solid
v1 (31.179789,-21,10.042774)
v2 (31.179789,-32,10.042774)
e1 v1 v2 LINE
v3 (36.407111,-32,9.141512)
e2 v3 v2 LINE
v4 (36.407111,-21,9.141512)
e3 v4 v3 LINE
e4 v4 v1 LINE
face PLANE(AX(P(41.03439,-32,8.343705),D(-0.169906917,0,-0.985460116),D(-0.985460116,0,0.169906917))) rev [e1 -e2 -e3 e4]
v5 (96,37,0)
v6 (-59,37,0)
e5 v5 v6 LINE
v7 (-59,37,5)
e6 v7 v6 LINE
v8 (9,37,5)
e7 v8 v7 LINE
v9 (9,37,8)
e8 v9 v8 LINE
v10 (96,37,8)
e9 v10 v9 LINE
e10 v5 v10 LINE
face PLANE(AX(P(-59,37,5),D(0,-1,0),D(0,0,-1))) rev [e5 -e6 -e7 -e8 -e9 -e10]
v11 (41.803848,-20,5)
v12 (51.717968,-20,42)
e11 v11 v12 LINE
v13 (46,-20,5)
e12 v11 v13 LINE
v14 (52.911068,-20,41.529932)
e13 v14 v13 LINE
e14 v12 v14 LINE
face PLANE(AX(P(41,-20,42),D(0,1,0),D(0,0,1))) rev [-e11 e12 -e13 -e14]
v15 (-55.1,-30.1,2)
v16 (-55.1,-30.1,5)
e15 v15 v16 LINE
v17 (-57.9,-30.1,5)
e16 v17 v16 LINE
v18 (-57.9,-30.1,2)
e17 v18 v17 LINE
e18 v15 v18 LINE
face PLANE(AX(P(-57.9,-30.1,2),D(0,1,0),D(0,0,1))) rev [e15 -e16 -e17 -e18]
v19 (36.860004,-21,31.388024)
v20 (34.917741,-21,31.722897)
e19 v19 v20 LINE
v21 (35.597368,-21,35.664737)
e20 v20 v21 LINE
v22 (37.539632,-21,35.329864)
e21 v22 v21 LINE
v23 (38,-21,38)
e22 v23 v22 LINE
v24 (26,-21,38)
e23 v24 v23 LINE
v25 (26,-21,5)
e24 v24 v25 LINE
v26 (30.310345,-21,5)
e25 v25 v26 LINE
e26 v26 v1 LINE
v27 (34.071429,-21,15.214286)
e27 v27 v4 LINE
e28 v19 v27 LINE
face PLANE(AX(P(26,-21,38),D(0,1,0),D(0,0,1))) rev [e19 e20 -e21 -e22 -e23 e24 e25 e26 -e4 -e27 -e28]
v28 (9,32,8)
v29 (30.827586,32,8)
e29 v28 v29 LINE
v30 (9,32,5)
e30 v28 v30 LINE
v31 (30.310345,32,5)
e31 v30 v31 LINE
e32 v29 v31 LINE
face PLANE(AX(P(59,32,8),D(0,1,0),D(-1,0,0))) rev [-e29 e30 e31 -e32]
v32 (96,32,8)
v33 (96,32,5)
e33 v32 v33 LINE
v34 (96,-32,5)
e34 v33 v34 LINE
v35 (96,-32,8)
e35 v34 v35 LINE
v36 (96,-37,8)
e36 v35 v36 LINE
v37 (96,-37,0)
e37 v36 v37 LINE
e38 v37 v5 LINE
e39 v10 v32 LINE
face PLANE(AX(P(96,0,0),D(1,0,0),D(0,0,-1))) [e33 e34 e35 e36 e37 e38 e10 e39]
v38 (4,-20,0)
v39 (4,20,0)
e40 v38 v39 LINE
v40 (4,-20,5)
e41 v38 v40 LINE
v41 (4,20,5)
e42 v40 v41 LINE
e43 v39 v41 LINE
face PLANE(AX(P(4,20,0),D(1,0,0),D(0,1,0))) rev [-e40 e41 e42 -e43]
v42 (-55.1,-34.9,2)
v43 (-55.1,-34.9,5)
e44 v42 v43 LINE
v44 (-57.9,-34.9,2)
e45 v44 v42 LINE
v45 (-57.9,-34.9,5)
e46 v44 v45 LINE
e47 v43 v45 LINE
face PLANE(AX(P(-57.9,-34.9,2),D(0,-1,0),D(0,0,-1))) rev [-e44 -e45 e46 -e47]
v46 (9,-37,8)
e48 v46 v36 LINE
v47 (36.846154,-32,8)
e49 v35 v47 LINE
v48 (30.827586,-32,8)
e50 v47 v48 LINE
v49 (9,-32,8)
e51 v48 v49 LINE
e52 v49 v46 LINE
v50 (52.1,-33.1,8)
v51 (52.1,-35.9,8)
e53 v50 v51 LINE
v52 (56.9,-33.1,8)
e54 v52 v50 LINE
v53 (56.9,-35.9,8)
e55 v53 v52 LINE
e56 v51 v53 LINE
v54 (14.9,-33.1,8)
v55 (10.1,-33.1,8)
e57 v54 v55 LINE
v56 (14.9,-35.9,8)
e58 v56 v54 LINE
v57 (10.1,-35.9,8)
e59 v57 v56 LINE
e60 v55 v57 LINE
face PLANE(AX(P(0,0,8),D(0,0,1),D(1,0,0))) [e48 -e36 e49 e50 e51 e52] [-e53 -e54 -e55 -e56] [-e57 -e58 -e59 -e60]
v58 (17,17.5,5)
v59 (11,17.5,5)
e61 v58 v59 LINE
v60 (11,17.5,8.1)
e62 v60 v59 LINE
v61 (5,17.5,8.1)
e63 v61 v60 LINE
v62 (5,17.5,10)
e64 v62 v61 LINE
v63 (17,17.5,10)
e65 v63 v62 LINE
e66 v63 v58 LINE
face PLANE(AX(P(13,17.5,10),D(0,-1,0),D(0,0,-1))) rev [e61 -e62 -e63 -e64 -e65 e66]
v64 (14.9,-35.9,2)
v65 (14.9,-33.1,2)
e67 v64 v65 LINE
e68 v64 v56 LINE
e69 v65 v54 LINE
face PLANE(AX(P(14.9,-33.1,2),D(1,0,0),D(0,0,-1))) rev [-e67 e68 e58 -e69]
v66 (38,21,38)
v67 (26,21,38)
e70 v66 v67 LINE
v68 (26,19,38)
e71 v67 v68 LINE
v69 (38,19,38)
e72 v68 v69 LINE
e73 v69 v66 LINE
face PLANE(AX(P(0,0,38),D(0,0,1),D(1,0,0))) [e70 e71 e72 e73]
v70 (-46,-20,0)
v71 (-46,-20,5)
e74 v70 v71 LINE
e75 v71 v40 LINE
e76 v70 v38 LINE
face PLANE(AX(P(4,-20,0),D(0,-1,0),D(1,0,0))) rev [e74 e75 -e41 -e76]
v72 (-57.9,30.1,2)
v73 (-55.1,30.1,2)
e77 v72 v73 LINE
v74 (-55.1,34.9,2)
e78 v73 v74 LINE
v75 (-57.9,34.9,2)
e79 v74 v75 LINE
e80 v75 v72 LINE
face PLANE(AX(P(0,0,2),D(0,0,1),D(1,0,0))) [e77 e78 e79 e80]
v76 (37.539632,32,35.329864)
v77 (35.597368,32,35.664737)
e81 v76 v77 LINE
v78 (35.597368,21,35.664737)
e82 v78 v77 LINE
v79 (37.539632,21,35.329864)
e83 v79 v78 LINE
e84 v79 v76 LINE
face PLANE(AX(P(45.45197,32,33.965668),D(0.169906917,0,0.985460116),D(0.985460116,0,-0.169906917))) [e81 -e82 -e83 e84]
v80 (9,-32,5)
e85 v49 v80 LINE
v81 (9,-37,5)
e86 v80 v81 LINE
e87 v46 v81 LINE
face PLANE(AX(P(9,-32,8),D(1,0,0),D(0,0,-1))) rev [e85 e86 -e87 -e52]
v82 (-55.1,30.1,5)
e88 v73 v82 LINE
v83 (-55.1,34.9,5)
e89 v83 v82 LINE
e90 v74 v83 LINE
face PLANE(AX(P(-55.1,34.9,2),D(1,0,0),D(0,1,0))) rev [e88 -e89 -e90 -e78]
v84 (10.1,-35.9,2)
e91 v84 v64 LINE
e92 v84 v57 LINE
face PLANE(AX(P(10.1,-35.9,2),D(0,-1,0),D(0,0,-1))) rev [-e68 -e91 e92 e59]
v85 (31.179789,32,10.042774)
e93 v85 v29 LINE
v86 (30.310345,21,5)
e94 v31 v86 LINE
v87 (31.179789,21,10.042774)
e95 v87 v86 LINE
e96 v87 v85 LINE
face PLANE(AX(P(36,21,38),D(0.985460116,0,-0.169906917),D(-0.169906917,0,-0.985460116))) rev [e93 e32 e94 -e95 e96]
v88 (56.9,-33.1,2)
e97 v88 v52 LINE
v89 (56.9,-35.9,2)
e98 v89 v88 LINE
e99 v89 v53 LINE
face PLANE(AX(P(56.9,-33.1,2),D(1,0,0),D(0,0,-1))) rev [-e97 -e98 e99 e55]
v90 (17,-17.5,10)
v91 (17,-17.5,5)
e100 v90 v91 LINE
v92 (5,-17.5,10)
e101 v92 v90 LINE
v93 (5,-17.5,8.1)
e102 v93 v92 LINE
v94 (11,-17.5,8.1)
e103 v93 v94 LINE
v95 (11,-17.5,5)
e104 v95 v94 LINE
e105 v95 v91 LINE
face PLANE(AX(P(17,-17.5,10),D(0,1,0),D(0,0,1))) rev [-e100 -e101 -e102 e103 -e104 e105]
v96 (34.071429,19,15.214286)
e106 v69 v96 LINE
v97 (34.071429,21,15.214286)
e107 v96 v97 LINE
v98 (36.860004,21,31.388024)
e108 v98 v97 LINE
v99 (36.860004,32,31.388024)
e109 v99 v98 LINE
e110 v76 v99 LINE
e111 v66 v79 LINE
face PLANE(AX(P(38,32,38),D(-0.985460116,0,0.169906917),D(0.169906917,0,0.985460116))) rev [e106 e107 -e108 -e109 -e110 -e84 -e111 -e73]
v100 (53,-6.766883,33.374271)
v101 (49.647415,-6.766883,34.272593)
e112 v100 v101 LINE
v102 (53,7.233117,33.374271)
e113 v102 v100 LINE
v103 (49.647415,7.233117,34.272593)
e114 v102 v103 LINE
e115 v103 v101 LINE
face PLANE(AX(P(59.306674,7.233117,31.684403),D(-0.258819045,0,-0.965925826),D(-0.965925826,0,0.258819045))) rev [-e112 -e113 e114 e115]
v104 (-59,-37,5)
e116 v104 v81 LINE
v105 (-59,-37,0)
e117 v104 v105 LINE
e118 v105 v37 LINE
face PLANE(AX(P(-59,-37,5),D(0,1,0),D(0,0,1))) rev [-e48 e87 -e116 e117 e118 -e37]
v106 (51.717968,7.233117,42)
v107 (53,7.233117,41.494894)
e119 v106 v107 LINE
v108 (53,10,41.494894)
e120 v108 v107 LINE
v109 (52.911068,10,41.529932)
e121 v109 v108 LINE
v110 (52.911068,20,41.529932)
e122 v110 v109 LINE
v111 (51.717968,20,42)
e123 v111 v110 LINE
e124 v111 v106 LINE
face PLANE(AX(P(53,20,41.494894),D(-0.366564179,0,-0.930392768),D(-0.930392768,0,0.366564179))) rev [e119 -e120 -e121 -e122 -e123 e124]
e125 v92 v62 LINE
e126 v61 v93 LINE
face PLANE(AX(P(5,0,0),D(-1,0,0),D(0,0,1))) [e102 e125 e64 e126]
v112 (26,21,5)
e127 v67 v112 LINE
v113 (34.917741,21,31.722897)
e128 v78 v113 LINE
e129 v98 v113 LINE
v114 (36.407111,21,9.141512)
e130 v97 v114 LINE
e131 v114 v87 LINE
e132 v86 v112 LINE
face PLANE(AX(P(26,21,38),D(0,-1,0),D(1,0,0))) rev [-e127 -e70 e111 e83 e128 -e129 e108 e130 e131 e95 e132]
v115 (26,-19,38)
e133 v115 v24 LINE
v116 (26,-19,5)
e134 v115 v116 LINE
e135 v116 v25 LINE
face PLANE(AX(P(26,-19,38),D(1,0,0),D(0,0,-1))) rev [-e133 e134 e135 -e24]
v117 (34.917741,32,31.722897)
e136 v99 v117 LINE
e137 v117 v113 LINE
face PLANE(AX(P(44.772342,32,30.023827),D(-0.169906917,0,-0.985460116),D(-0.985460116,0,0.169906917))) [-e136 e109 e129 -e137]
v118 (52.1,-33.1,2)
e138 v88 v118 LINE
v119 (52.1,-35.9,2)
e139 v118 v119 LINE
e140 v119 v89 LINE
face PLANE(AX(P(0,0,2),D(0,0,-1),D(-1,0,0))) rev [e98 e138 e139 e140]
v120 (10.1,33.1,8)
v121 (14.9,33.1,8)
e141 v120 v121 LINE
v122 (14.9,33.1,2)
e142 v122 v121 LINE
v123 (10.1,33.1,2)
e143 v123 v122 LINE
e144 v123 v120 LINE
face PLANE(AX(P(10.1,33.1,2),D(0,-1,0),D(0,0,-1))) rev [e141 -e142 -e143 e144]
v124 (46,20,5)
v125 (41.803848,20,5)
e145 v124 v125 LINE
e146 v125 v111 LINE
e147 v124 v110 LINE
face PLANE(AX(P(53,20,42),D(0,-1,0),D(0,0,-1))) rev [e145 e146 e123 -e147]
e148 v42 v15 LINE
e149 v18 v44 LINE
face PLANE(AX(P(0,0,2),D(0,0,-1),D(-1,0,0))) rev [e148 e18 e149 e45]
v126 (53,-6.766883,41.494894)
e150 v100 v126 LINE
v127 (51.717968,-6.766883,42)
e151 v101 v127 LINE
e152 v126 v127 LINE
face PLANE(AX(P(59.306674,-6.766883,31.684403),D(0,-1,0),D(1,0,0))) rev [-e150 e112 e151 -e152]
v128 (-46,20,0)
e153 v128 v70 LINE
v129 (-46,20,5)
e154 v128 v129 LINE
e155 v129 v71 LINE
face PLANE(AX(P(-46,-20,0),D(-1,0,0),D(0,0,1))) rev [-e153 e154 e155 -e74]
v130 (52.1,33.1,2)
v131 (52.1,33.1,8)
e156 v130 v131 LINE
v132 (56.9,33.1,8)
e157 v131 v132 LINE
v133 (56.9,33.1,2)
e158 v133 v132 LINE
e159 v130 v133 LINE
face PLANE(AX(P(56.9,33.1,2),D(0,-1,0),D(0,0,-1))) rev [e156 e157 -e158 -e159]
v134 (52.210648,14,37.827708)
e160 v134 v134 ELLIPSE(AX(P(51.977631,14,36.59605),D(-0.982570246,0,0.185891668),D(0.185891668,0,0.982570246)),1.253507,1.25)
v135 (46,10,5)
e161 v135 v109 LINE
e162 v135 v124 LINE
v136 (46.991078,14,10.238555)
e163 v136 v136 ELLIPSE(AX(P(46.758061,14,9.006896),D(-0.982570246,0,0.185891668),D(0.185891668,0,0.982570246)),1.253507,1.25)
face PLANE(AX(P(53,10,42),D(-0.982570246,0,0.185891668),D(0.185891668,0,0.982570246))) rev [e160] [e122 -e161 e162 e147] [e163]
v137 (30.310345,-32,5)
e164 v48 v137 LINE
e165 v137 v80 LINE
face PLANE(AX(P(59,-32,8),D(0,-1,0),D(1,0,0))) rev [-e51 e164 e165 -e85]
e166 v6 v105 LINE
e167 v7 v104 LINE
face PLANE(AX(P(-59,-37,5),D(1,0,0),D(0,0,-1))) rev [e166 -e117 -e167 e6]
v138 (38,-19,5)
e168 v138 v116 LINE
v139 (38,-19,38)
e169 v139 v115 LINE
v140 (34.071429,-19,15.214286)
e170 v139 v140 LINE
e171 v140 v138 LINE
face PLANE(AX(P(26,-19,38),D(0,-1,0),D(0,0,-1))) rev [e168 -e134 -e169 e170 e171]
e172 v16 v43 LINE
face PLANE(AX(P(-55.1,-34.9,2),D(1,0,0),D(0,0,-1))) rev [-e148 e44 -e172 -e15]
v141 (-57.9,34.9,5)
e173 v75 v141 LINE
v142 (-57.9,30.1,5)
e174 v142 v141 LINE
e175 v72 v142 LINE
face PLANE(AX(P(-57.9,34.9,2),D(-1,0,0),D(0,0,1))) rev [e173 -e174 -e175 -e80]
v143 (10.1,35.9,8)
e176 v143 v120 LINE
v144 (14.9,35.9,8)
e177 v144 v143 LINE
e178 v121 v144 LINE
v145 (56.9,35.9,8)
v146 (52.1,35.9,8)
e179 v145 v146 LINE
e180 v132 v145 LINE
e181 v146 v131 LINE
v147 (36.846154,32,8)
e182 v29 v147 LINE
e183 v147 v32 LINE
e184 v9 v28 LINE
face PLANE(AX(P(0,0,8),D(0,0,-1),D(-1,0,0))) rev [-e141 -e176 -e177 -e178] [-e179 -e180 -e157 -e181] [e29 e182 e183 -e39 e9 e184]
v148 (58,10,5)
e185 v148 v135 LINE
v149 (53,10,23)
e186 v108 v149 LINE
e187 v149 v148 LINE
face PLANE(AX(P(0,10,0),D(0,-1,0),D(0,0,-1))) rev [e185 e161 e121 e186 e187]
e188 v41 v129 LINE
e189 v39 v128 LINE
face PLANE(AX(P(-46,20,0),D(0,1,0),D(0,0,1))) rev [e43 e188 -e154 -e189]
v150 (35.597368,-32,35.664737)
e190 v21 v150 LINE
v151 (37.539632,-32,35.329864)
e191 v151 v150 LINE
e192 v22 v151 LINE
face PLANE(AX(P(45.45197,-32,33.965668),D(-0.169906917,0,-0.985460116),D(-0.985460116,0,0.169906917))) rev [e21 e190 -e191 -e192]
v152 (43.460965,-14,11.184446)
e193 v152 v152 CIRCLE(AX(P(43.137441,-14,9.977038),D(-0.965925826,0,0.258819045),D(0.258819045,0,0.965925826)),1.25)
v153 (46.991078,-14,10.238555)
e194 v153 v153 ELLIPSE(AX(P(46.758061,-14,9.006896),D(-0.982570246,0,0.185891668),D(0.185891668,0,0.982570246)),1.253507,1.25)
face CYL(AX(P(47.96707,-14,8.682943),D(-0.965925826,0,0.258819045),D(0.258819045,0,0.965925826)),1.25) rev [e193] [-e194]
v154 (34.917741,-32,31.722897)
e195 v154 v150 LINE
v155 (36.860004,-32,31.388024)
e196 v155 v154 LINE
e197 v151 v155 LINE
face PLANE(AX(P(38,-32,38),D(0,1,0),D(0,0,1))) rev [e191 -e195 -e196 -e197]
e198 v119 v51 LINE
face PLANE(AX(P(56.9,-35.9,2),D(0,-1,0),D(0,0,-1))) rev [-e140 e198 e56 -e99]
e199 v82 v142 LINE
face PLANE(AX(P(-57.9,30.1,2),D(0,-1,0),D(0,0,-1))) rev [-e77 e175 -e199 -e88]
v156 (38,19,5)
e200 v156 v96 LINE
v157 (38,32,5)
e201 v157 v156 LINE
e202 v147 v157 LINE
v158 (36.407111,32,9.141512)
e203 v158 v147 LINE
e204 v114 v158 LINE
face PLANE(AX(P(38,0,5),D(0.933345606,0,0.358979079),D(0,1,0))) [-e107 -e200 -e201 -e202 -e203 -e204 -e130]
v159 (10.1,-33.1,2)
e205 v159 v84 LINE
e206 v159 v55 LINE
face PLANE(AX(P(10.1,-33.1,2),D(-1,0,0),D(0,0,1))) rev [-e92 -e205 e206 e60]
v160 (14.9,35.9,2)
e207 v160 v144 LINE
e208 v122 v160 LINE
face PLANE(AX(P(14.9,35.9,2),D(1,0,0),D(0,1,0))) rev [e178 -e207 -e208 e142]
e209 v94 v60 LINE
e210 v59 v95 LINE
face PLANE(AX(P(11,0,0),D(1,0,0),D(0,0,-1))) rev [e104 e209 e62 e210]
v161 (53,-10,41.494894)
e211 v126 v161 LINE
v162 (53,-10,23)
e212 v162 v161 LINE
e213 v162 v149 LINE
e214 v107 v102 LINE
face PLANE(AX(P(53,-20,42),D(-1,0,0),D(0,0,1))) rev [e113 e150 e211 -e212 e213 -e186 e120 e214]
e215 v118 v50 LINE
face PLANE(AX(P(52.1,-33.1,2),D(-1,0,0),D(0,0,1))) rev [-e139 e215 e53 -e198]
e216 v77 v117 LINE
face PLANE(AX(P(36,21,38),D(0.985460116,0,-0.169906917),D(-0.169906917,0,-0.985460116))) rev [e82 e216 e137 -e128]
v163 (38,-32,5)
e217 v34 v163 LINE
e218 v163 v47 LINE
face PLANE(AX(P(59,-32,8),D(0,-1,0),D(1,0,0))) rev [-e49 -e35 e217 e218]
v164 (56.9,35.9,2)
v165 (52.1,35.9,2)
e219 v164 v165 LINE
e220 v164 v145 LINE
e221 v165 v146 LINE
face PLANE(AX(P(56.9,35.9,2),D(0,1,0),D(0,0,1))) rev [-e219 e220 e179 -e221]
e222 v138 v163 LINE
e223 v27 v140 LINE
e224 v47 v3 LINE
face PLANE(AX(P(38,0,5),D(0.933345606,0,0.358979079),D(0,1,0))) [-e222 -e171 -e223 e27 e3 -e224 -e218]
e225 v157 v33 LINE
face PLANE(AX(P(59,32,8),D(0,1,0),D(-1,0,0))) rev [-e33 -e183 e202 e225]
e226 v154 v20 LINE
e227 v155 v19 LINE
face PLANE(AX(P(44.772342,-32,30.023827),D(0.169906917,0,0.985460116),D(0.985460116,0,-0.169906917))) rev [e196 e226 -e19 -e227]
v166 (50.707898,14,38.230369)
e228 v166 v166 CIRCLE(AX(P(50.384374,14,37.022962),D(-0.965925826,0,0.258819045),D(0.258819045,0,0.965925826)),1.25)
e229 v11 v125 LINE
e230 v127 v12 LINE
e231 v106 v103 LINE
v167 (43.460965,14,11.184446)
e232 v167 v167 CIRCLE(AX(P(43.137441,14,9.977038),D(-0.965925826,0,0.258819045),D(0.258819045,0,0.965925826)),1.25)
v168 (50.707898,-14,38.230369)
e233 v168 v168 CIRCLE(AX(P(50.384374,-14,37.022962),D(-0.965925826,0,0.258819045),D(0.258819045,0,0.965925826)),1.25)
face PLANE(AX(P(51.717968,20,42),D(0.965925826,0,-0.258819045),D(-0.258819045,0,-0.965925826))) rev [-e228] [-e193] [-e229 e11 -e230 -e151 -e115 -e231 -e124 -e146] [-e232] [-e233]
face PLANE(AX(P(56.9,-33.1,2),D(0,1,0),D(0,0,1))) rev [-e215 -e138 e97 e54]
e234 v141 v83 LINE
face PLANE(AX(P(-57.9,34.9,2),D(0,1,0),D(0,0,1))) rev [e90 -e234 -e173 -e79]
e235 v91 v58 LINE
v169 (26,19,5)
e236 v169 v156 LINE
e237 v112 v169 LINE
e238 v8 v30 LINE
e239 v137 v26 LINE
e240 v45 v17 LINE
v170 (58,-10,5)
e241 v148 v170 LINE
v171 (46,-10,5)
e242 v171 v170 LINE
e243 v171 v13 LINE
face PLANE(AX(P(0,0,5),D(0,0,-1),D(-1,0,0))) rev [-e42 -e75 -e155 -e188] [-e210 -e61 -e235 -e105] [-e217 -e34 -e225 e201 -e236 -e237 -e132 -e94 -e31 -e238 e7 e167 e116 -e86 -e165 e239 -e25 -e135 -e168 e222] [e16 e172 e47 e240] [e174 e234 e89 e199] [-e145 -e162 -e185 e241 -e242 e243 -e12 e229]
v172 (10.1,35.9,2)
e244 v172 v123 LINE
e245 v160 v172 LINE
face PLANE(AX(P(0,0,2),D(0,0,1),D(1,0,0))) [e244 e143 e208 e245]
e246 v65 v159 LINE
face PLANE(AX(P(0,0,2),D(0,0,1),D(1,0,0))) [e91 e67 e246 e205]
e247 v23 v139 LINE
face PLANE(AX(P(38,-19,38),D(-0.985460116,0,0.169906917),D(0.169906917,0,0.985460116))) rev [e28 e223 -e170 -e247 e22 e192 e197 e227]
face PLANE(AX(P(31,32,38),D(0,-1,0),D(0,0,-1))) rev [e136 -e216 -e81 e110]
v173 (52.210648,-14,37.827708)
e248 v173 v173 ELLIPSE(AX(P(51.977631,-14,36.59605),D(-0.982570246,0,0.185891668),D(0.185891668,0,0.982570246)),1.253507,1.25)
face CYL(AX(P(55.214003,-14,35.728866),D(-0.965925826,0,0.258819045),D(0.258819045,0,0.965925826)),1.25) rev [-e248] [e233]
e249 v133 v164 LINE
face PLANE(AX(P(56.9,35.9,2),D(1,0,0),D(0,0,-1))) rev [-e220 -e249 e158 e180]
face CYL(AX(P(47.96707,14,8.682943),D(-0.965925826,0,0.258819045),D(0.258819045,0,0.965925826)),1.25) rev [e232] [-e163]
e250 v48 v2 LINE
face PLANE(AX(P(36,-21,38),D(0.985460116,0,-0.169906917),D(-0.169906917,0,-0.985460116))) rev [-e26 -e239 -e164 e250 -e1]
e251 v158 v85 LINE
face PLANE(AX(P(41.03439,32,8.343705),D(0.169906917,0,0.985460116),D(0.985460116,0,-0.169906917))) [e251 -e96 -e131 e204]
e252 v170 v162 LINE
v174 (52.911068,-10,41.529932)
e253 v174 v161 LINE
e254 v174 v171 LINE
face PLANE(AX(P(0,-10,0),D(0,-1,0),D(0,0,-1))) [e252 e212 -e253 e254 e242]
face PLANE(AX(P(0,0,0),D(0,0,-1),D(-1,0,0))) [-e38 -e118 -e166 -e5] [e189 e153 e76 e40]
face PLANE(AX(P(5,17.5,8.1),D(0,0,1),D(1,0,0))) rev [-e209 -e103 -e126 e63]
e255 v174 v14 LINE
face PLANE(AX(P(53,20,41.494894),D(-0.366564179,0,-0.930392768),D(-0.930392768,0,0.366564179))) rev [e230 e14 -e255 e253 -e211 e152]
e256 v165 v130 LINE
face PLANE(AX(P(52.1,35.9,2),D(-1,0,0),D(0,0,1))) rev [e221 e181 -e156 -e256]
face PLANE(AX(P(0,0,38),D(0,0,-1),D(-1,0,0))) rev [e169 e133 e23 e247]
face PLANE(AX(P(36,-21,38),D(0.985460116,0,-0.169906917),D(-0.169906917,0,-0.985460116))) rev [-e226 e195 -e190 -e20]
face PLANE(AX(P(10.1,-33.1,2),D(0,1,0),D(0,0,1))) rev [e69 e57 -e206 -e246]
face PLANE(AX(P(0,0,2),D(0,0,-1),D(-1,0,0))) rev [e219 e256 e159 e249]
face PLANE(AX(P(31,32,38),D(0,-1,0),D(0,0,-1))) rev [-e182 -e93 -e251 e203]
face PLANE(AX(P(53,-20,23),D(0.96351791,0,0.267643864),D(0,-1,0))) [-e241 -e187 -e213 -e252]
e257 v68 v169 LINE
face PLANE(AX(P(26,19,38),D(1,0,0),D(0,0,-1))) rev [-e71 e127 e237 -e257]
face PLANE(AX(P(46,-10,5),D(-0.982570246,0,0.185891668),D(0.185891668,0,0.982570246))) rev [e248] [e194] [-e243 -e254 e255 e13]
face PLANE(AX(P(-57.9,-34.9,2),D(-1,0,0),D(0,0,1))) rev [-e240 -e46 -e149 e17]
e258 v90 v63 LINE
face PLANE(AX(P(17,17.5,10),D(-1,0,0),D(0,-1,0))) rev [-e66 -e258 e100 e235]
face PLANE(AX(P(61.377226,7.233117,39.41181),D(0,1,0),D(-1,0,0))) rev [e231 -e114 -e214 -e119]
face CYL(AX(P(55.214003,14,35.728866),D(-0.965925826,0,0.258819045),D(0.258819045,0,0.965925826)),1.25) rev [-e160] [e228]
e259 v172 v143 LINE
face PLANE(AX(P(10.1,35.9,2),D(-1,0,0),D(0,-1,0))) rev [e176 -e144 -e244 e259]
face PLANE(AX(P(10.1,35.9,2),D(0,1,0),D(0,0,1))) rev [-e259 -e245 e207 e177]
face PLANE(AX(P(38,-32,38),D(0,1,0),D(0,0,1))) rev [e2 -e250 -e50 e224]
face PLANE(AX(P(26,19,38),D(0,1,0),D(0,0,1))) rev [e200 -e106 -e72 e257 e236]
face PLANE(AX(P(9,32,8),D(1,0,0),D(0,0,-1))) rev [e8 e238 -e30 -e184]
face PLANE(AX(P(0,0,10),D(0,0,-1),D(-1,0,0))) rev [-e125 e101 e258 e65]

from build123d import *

# Parameters (mm, degrees)
CROQUIS1_W               = 118
CROQUIS1_H               = 74
SALIENTE_EXTRUIR1_DEPTH  = 5
CROQUIS2_W               = 50
CROQUIS2_H               = 40
CORTAR_EXTRUIR1_DEPTH    = 5
CROQUIS3_W               = 50
CROQUIS3_H               = 5
SALIENTE_EXTRUIR2_DEPTH  = 3
CROQUIS4_W               = 4.8
CROQUIS4_H               = 2.8
CROQUIS4_W_2             = 2.8
CROQUIS4_H_2             = 4.8
CORTAR_EXTRUIR2_DEPTH    = 6
CROQUIS5_W               = 3
CROQUIS5_H               = 40
CORTAR_EXTRUIR3_DEPTH    = 3
CROQUIS6_W               = 12
CROQUIS6_H               = 40
SALIENTE_EXTRUIR3_DEPTH  = 40
CROQUIS8_W               = 4
CROQUIS8_H               = 35
SALIENTE_EXTRUIR5_DEPTH  = 5
SALIENTE_EXTRUIR7_DEPTH  = 33
CORTAR_EXTRUIR6_DEPTH    = 11
CORTAR_EXTRUIR7_DEPTH    = 13
CORTAR_EXTRUIR8_DEPTH    = 13
CORTAR_EXTRUIR9_DEPTH    = 11
CROQUIS10_W              = 1.9
CROQUIS10_H              = 35
SALIENTE_EXTRUIR9_DEPTH  = 8
CROQUIS22_W              = 3.1
CROQUIS22_H              = 35
SALIENTE_EXTRUIR10_DEPTH = 2
CORTAR_EXTRUIR11_DEPTH   = 40
CROQUIS23_W              = 3
CROQUIS23_H              = 40
SALIENTE_EXTRUIR11_DEPTH = 10
CORTAR_EXTRUIR12_DEPTH   = 10
CORTAR_EXTRUIR13_DEPTH   = 10
CORTAR_EXTRUIR14_DEPTH   = 40
CROQUIS28_R              = 1.25
CORTAR_EXTRUIR15_DEPTH   = 5
SALIENTE_EXTRUIR12_DEPTH = 37
CROQUIS30_W              = 29.42787794
CROQUIS30_H              = 11
SALIENTE_EXTRUIR13_DEPTH = 1.970920231
CHAFL_N1_SIZE            = 5
CHAFL_N1_SIZE2           = 18
CHAFL_N2_SIZE            = 5
CHAFL_N2_SIZE_2          = 13
CHAFL_N3_SIZE            = 5
CHAFL_N3_SIZE_2          = 13
CROQUIS51_W              = 8
CROQUIS51_H              = 14
CORTAR_EXTRUIR23_DEPTH   = 10
CROQUIS52_W              = 9
CROQUIS52_H              = 11
CROQUIS52_W_2            = 8
CROQUIS52_W_3            = 4.539822883
CORTAR_EXTRUIR25_DEPTH   = 10
SALIENTE_EXTRUIR20_DEPTH = 12
CROQUIS54_W              = 5
CROQUIS54_H              = 11
CORTAR_EXTRUIR26_DEPTH   = 10
CROQUIS55_W              = 5
CROQUIS55_H              = 11
CORTAR_EXTRUIR30_DEPTH   = 10


with BuildPart() as part:
    # Croquis1 → Saliente-Extruir1 (new body)
    with BuildSketch(Plane.XY):
        Rectangle(CROQUIS1_W, CROQUIS1_H)
    extrude(amount=SALIENTE_EXTRUIR1_DEPTH)

    # Croquis2 → Cortar-Extruir1 (cut)
    with BuildSketch(Plane.XY.offset(5)):
        with Locations((-21, 0)):
            Rectangle(CROQUIS2_W, CROQUIS2_H)
    extrude(amount=-CORTAR_EXTRUIR1_DEPTH, mode=Mode.SUBTRACT)

    # Croquis3 → Saliente-Extruir2 (add)
    with BuildSketch(Plane.XY.offset(5)):
        with Locations((34, 34.5)):
            Rectangle(CROQUIS3_W, CROQUIS3_H)
        with Locations((34, -34.5)):
            Rectangle(CROQUIS3_W, CROQUIS3_H)
    extrude(amount=SALIENTE_EXTRUIR2_DEPTH)

    # Croquis4 → Cortar-Extruir2 (cut)
    with BuildSketch(Plane.XY.offset(8)):
        with Locations((54.5, 34.5)):
            Rectangle(CROQUIS4_W, CROQUIS4_H)
        with Locations((12.5, 34.5)):
            Rectangle(CROQUIS4_W, CROQUIS4_H)
        with Locations((12.5, -34.5)):
            Rectangle(CROQUIS4_W, CROQUIS4_H)
        with Locations((54.5, -34.5)):
            Rectangle(CROQUIS4_W, CROQUIS4_H)
        with Locations((-56.5, -32.5)):
            Rectangle(CROQUIS4_W_2, CROQUIS4_H_2)
        with Locations((-56.5, 32.5)):
            Rectangle(CROQUIS4_W_2, CROQUIS4_H_2)
    extrude(amount=-CORTAR_EXTRUIR2_DEPTH, mode=Mode.SUBTRACT)

    # Croquis5 → Cortar-Extruir3 (cut)
    with BuildSketch(Plane.XY.offset(5)):
        with Locations((39.5, 0)):
            Rectangle(CROQUIS5_W, CROQUIS5_H)
    extrude(amount=-CORTAR_EXTRUIR3_DEPTH, mode=Mode.SUBTRACT)

    # Croquis6 → Saliente-Extruir3 (add)
    with BuildSketch(Plane.XY.offset(2)):
        with Locations((47, 0)):
            Rectangle(CROQUIS6_W, CROQUIS6_H)
    extrude(amount=SALIENTE_EXTRUIR3_DEPTH)

    # Croquis8 → Saliente-Extruir5 (add)
    with BuildSketch(Plane.XY.offset(5)):
        with Locations((15, 0)):
            Rectangle(CROQUIS8_W, CROQUIS8_H)
    extrude(amount=SALIENTE_EXTRUIR5_DEPTH)

    # Croquis12 → Saliente-Extruir7 (add)
    with BuildSketch(Plane.XY.offset(5)):
        Polygon((26, -19), (38, -19), (38, -32), (31, -32), (31, -21), (26, -21), align=None)
        Polygon((31, 32), (38, 32), (38, 19), (26, 19), (26, 21), (31, 21), align=None)
    extrude(amount=SALIENTE_EXTRUIR7_DEPTH)

    # Croquis14 → Cortar-Extruir6 (cut)
    with BuildSketch(Plane(origin=(0, 32, 0), x_dir=(1, 0, 0), z_dir=(0, 1, 0))):
        Polygon((31, -38), (36, -38), (31, -9), align=None)
    extrude(amount=-CORTAR_EXTRUIR6_DEPTH, mode=Mode.SUBTRACT)

    # Croquis16 → Cortar-Extruir7 (cut)
    with BuildSketch(Plane.XZ.offset(-19)):
        Polygon((38, 38), (38, 5), (33, 5), (33, 9), align=None)
    extrude(amount=-CORTAR_EXTRUIR7_DEPTH, mode=Mode.SUBTRACT)

    # Croquis17 → Cortar-Extruir8 (cut)
    with BuildSketch(Plane.XZ.offset(32)):
        Polygon((38, 38), (38, 5), (33, 5), (33, 9), align=None)
    extrude(amount=-CORTAR_EXTRUIR8_DEPTH, mode=Mode.SUBTRACT)

    # Croquis18 → Cortar-Extruir9 (cut)
    with BuildSketch(Plane.XZ.offset(32)):
        Polygon((31, 38), (36, 38), (31, 9), align=None)
    extrude(amount=-CORTAR_EXTRUIR9_DEPTH, mode=Mode.SUBTRACT)

    # Croquis10 → Saliente-Extruir9 (add)
    with BuildSketch(Plane.ZY.offset(-13)):
        with Locations((9.05, 0)):
            Rectangle(CROQUIS10_W, CROQUIS10_H)
    extrude(amount=SALIENTE_EXTRUIR9_DEPTH)

    # Croquis22 → Saliente-Extruir10 (add)
    with BuildSketch(Plane.ZY.offset(-13)):
        with Locations((6.55, 0)):
            Rectangle(CROQUIS22_W, CROQUIS22_H)
    extrude(amount=SALIENTE_EXTRUIR10_DEPTH)

    # Croquis7 → Cortar-Extruir11 (cut)
    with BuildSketch(Plane.XZ.offset(20)):
        Polygon((51.717967697, 42), (41, 2), (41, 42), align=None)
    extrude(amount=-CORTAR_EXTRUIR11_DEPTH, mode=Mode.SUBTRACT)

    # Croquis23 → Saliente-Extruir11 (add)
    with BuildSketch(Plane(origin=(38, 0, 0), x_dir=(0, 0, -1), z_dir=(1, 0, 0))):
        with Locations((-3.5, 0)):
            Rectangle(CROQUIS23_W, CROQUIS23_H)
    extrude(amount=SALIENTE_EXTRUIR11_DEPTH)

    # Croquis25 → Cortar-Extruir12 (cut)
    with BuildSketch(Plane.XZ.offset(20)):
        Polygon((53, 42), (53, 5), (46, 5), align=None)
    extrude(amount=-CORTAR_EXTRUIR12_DEPTH, mode=Mode.SUBTRACT)

    # Croquis26 → Cortar-Extruir13 (cut)
    with BuildSketch(Plane(origin=(0, 20, 0), x_dir=(1, 0, 0), z_dir=(0, 1, 0))):
        Polygon((53, -5), (53, -42), (46, -5), align=None)
    extrude(amount=-CORTAR_EXTRUIR13_DEPTH, mode=Mode.SUBTRACT)

    # Croquis27 → Cortar-Extruir14 (cut)
    with BuildSketch(Plane.XZ.offset(20)):
        Polygon((51.717967697, 42), (53, 42), (53, 41.49489384), align=None)
    extrude(amount=-CORTAR_EXTRUIR14_DEPTH, mode=Mode.SUBTRACT)

    # Croquis28 → Cortar-Extruir15 (cut)
    with BuildSketch(Plane(origin=(37.753520778, 0, -10.116025404), x_dir=(0.25881904510251397, 0, 0.9659258262890701), z_dir=(-0.9659258262890701, 0, 0.25881904510251397))):
        with Locations((20.801870381, 14)):
            Circle(CROQUIS28_R)
        with Locations((48.801870381, 14)):
            Circle(CROQUIS28_R)
        with Locations((48.801870381, -14)):
            Circle(CROQUIS28_R)
        with Locations((20.801870381, -14)):
            Circle(CROQUIS28_R)
    extrude(amount=-CORTAR_EXTRUIR15_DEPTH, mode=Mode.SUBTRACT)

    # Croquis29 → Saliente-Extruir12 (add)
    with BuildSketch(Plane(origin=(59, 0, 0), x_dir=(0, 0, -1), z_dir=(1, 0, 0))):
        Polygon((-8, 37), (0, 37), (0, -37), (-8, -37), (-8, -32), (-5, -32), (-5, 32), (-8, 32), align=None)
    extrude(amount=SALIENTE_EXTRUIR12_DEPTH)

    # Croquis30 → Saliente-Extruir13 (add)
    with BuildSketch(Plane(origin=(28.598152425, 0, -4.930715935), x_dir=(0.1699069165076461, 0, 0.9854601157443481), z_dir=(-0.9854601157443481, 0, 0.1699069165076461))):
        with Locations((28.850194423, 26.5)):
            Rectangle(CROQUIS30_W, CROQUIS30_H)
    saliente_extruir13 = extrude(amount=-SALIENTE_EXTRUIR13_DEPTH)

    # Simetría3: Saliente-Extruir13 across plane
    add(saliente_extruir13.mirror(Plane.ZX))

    # Chaflán1
    chafl_n1_edges = [part.edges().sort_by_distance(p)[0] for p in [
        (53, 0, 5),
    ]]
    chafl_n1_side = [part.faces().sort_by_distance(p)[0] for p in [
        (23.870652036, 0, 5),
    ]]
    chamfer(chafl_n1_edges, length=CHAFL_N1_SIZE, length2=CHAFL_N1_SIZE2, reference=chafl_n1_side[0])

    # Chaflán2
    # the kernel refuses this chamfer: 13, 5 mm, written as the material it adds along each edge
    with BuildSketch(Plane(origin=(33, 19, 5), x_dir=(0.9956504543602249, 0, -0.09316744459454417), z_dir=(0, 1, 0))) as chafl_n2_piece_1:
        Polygon((CHAFL_N2_SIZE * 0.99565045436, -CHAFL_N2_SIZE * 0.0931674445945), (-CHAFL_N2_SIZE_2 * 0.0931674445945, -CHAFL_N2_SIZE_2 * 0.99565045436), (0, 0), align=None)
    extrude(amount=13)

    # Chaflán3
    # the kernel refuses this chamfer: 13, 5 mm, written as the material it adds along each edge
    with BuildSketch(Plane(origin=(33, -32, 5), x_dir=(0.9956504543602249, 0, -0.09316744459454485), z_dir=(0, 1, 0))) as chafl_n3_piece_1:
        Polygon((CHAFL_N3_SIZE * 0.99565045436, -CHAFL_N3_SIZE * 0.0931674445945), (-CHAFL_N3_SIZE_2 * 0.0931674445945, -CHAFL_N3_SIZE_2 * 0.99565045436), (0, 0), align=None)
    extrude(amount=13)

    # Croquis51 → Cortar-Extruir23 (cut)
    with BuildSketch(Plane(origin=(37.753520778, 0, -10.116025404), x_dir=(0.2588190451025144, 0, 0.96592582628907), z_dir=(-0.96592582628907, 0, 0.2588190451025144))):
        with Locations((49.954479718, 0.233117344)):
            Rectangle(CROQUIS51_W, CROQUIS51_H)
    extrude(amount=-CORTAR_EXTRUIR23_DEPTH, mode=Mode.SUBTRACT)

    # Croquis52 → Cortar-Extruir25 (cut)
    with BuildSketch(Plane(origin=(28.598152425, 0, -4.930715935), x_dir=(0.1699069165076461, 0, 0.985460115744348), z_dir=(-0.985460115744348, 0, 0.1699069165076461))):
        with Locations((19.69441499, -26.5)):
            Rectangle(CROQUIS52_W, CROQUIS52_H)
        with Locations((33.19441499, -26.5)):
            Rectangle(CROQUIS52_W_2, CROQUIS52_H)
        with Locations((43.464326432, -26.5)):
            Rectangle(CROQUIS52_W_3, CROQUIS52_H)
    cortar_extruir25 = extrude(amount=-CORTAR_EXTRUIR25_DEPTH, mode=Mode.SUBTRACT)

    # Croquis53 → Saliente-Extruir20 (add)
    with BuildSketch(Plane.XZ.offset(32)):
        Polygon((31, 9), (30.122515807, 3.910591681), (31.179788624, 3.910591681), align=None)
    saliente_extruir20 = extrude(amount=-SALIENTE_EXTRUIR20_DEPTH)

    # Simetría8: Cortar-Extruir25, Saliente-Extruir20 across plane
    add(cortar_extruir25.mirror(Plane.ZX), mode=Mode.SUBTRACT)
    add(saliente_extruir20.mirror(Plane.ZX))

    # Croquis54 → Cortar-Extruir26 (cut)
    with BuildSketch(Plane(origin=(28.598152425, 0, -4.930715935), x_dir=(0.16990691650764617, 0, 0.985460115744348), z_dir=(-0.985460115744348, 0, 0.16990691650764617))):
        with Locations((26.69441499, 26.5)):
            Rectangle(CROQUIS54_W, CROQUIS54_H)
    extrude(amount=-CORTAR_EXTRUIR26_DEPTH, mode=Mode.SUBTRACT)

    # Croquis55 → Cortar-Extruir30 (cut)
    with BuildSketch(Plane(origin=(28.598152425, 0, -4.930715935), x_dir=(0.16990691650764617, 0, 0.985460115744348), z_dir=(-0.985460115744348, 0, 0.16990691650764617))):
        with Locations((26.69441499, -26.5)):
            Rectangle(CROQUIS55_W, CROQUIS55_H)
    extrude(amount=-CORTAR_EXTRUIR30_DEPTH, mode=Mode.SUBTRACT)


solid = part.part
